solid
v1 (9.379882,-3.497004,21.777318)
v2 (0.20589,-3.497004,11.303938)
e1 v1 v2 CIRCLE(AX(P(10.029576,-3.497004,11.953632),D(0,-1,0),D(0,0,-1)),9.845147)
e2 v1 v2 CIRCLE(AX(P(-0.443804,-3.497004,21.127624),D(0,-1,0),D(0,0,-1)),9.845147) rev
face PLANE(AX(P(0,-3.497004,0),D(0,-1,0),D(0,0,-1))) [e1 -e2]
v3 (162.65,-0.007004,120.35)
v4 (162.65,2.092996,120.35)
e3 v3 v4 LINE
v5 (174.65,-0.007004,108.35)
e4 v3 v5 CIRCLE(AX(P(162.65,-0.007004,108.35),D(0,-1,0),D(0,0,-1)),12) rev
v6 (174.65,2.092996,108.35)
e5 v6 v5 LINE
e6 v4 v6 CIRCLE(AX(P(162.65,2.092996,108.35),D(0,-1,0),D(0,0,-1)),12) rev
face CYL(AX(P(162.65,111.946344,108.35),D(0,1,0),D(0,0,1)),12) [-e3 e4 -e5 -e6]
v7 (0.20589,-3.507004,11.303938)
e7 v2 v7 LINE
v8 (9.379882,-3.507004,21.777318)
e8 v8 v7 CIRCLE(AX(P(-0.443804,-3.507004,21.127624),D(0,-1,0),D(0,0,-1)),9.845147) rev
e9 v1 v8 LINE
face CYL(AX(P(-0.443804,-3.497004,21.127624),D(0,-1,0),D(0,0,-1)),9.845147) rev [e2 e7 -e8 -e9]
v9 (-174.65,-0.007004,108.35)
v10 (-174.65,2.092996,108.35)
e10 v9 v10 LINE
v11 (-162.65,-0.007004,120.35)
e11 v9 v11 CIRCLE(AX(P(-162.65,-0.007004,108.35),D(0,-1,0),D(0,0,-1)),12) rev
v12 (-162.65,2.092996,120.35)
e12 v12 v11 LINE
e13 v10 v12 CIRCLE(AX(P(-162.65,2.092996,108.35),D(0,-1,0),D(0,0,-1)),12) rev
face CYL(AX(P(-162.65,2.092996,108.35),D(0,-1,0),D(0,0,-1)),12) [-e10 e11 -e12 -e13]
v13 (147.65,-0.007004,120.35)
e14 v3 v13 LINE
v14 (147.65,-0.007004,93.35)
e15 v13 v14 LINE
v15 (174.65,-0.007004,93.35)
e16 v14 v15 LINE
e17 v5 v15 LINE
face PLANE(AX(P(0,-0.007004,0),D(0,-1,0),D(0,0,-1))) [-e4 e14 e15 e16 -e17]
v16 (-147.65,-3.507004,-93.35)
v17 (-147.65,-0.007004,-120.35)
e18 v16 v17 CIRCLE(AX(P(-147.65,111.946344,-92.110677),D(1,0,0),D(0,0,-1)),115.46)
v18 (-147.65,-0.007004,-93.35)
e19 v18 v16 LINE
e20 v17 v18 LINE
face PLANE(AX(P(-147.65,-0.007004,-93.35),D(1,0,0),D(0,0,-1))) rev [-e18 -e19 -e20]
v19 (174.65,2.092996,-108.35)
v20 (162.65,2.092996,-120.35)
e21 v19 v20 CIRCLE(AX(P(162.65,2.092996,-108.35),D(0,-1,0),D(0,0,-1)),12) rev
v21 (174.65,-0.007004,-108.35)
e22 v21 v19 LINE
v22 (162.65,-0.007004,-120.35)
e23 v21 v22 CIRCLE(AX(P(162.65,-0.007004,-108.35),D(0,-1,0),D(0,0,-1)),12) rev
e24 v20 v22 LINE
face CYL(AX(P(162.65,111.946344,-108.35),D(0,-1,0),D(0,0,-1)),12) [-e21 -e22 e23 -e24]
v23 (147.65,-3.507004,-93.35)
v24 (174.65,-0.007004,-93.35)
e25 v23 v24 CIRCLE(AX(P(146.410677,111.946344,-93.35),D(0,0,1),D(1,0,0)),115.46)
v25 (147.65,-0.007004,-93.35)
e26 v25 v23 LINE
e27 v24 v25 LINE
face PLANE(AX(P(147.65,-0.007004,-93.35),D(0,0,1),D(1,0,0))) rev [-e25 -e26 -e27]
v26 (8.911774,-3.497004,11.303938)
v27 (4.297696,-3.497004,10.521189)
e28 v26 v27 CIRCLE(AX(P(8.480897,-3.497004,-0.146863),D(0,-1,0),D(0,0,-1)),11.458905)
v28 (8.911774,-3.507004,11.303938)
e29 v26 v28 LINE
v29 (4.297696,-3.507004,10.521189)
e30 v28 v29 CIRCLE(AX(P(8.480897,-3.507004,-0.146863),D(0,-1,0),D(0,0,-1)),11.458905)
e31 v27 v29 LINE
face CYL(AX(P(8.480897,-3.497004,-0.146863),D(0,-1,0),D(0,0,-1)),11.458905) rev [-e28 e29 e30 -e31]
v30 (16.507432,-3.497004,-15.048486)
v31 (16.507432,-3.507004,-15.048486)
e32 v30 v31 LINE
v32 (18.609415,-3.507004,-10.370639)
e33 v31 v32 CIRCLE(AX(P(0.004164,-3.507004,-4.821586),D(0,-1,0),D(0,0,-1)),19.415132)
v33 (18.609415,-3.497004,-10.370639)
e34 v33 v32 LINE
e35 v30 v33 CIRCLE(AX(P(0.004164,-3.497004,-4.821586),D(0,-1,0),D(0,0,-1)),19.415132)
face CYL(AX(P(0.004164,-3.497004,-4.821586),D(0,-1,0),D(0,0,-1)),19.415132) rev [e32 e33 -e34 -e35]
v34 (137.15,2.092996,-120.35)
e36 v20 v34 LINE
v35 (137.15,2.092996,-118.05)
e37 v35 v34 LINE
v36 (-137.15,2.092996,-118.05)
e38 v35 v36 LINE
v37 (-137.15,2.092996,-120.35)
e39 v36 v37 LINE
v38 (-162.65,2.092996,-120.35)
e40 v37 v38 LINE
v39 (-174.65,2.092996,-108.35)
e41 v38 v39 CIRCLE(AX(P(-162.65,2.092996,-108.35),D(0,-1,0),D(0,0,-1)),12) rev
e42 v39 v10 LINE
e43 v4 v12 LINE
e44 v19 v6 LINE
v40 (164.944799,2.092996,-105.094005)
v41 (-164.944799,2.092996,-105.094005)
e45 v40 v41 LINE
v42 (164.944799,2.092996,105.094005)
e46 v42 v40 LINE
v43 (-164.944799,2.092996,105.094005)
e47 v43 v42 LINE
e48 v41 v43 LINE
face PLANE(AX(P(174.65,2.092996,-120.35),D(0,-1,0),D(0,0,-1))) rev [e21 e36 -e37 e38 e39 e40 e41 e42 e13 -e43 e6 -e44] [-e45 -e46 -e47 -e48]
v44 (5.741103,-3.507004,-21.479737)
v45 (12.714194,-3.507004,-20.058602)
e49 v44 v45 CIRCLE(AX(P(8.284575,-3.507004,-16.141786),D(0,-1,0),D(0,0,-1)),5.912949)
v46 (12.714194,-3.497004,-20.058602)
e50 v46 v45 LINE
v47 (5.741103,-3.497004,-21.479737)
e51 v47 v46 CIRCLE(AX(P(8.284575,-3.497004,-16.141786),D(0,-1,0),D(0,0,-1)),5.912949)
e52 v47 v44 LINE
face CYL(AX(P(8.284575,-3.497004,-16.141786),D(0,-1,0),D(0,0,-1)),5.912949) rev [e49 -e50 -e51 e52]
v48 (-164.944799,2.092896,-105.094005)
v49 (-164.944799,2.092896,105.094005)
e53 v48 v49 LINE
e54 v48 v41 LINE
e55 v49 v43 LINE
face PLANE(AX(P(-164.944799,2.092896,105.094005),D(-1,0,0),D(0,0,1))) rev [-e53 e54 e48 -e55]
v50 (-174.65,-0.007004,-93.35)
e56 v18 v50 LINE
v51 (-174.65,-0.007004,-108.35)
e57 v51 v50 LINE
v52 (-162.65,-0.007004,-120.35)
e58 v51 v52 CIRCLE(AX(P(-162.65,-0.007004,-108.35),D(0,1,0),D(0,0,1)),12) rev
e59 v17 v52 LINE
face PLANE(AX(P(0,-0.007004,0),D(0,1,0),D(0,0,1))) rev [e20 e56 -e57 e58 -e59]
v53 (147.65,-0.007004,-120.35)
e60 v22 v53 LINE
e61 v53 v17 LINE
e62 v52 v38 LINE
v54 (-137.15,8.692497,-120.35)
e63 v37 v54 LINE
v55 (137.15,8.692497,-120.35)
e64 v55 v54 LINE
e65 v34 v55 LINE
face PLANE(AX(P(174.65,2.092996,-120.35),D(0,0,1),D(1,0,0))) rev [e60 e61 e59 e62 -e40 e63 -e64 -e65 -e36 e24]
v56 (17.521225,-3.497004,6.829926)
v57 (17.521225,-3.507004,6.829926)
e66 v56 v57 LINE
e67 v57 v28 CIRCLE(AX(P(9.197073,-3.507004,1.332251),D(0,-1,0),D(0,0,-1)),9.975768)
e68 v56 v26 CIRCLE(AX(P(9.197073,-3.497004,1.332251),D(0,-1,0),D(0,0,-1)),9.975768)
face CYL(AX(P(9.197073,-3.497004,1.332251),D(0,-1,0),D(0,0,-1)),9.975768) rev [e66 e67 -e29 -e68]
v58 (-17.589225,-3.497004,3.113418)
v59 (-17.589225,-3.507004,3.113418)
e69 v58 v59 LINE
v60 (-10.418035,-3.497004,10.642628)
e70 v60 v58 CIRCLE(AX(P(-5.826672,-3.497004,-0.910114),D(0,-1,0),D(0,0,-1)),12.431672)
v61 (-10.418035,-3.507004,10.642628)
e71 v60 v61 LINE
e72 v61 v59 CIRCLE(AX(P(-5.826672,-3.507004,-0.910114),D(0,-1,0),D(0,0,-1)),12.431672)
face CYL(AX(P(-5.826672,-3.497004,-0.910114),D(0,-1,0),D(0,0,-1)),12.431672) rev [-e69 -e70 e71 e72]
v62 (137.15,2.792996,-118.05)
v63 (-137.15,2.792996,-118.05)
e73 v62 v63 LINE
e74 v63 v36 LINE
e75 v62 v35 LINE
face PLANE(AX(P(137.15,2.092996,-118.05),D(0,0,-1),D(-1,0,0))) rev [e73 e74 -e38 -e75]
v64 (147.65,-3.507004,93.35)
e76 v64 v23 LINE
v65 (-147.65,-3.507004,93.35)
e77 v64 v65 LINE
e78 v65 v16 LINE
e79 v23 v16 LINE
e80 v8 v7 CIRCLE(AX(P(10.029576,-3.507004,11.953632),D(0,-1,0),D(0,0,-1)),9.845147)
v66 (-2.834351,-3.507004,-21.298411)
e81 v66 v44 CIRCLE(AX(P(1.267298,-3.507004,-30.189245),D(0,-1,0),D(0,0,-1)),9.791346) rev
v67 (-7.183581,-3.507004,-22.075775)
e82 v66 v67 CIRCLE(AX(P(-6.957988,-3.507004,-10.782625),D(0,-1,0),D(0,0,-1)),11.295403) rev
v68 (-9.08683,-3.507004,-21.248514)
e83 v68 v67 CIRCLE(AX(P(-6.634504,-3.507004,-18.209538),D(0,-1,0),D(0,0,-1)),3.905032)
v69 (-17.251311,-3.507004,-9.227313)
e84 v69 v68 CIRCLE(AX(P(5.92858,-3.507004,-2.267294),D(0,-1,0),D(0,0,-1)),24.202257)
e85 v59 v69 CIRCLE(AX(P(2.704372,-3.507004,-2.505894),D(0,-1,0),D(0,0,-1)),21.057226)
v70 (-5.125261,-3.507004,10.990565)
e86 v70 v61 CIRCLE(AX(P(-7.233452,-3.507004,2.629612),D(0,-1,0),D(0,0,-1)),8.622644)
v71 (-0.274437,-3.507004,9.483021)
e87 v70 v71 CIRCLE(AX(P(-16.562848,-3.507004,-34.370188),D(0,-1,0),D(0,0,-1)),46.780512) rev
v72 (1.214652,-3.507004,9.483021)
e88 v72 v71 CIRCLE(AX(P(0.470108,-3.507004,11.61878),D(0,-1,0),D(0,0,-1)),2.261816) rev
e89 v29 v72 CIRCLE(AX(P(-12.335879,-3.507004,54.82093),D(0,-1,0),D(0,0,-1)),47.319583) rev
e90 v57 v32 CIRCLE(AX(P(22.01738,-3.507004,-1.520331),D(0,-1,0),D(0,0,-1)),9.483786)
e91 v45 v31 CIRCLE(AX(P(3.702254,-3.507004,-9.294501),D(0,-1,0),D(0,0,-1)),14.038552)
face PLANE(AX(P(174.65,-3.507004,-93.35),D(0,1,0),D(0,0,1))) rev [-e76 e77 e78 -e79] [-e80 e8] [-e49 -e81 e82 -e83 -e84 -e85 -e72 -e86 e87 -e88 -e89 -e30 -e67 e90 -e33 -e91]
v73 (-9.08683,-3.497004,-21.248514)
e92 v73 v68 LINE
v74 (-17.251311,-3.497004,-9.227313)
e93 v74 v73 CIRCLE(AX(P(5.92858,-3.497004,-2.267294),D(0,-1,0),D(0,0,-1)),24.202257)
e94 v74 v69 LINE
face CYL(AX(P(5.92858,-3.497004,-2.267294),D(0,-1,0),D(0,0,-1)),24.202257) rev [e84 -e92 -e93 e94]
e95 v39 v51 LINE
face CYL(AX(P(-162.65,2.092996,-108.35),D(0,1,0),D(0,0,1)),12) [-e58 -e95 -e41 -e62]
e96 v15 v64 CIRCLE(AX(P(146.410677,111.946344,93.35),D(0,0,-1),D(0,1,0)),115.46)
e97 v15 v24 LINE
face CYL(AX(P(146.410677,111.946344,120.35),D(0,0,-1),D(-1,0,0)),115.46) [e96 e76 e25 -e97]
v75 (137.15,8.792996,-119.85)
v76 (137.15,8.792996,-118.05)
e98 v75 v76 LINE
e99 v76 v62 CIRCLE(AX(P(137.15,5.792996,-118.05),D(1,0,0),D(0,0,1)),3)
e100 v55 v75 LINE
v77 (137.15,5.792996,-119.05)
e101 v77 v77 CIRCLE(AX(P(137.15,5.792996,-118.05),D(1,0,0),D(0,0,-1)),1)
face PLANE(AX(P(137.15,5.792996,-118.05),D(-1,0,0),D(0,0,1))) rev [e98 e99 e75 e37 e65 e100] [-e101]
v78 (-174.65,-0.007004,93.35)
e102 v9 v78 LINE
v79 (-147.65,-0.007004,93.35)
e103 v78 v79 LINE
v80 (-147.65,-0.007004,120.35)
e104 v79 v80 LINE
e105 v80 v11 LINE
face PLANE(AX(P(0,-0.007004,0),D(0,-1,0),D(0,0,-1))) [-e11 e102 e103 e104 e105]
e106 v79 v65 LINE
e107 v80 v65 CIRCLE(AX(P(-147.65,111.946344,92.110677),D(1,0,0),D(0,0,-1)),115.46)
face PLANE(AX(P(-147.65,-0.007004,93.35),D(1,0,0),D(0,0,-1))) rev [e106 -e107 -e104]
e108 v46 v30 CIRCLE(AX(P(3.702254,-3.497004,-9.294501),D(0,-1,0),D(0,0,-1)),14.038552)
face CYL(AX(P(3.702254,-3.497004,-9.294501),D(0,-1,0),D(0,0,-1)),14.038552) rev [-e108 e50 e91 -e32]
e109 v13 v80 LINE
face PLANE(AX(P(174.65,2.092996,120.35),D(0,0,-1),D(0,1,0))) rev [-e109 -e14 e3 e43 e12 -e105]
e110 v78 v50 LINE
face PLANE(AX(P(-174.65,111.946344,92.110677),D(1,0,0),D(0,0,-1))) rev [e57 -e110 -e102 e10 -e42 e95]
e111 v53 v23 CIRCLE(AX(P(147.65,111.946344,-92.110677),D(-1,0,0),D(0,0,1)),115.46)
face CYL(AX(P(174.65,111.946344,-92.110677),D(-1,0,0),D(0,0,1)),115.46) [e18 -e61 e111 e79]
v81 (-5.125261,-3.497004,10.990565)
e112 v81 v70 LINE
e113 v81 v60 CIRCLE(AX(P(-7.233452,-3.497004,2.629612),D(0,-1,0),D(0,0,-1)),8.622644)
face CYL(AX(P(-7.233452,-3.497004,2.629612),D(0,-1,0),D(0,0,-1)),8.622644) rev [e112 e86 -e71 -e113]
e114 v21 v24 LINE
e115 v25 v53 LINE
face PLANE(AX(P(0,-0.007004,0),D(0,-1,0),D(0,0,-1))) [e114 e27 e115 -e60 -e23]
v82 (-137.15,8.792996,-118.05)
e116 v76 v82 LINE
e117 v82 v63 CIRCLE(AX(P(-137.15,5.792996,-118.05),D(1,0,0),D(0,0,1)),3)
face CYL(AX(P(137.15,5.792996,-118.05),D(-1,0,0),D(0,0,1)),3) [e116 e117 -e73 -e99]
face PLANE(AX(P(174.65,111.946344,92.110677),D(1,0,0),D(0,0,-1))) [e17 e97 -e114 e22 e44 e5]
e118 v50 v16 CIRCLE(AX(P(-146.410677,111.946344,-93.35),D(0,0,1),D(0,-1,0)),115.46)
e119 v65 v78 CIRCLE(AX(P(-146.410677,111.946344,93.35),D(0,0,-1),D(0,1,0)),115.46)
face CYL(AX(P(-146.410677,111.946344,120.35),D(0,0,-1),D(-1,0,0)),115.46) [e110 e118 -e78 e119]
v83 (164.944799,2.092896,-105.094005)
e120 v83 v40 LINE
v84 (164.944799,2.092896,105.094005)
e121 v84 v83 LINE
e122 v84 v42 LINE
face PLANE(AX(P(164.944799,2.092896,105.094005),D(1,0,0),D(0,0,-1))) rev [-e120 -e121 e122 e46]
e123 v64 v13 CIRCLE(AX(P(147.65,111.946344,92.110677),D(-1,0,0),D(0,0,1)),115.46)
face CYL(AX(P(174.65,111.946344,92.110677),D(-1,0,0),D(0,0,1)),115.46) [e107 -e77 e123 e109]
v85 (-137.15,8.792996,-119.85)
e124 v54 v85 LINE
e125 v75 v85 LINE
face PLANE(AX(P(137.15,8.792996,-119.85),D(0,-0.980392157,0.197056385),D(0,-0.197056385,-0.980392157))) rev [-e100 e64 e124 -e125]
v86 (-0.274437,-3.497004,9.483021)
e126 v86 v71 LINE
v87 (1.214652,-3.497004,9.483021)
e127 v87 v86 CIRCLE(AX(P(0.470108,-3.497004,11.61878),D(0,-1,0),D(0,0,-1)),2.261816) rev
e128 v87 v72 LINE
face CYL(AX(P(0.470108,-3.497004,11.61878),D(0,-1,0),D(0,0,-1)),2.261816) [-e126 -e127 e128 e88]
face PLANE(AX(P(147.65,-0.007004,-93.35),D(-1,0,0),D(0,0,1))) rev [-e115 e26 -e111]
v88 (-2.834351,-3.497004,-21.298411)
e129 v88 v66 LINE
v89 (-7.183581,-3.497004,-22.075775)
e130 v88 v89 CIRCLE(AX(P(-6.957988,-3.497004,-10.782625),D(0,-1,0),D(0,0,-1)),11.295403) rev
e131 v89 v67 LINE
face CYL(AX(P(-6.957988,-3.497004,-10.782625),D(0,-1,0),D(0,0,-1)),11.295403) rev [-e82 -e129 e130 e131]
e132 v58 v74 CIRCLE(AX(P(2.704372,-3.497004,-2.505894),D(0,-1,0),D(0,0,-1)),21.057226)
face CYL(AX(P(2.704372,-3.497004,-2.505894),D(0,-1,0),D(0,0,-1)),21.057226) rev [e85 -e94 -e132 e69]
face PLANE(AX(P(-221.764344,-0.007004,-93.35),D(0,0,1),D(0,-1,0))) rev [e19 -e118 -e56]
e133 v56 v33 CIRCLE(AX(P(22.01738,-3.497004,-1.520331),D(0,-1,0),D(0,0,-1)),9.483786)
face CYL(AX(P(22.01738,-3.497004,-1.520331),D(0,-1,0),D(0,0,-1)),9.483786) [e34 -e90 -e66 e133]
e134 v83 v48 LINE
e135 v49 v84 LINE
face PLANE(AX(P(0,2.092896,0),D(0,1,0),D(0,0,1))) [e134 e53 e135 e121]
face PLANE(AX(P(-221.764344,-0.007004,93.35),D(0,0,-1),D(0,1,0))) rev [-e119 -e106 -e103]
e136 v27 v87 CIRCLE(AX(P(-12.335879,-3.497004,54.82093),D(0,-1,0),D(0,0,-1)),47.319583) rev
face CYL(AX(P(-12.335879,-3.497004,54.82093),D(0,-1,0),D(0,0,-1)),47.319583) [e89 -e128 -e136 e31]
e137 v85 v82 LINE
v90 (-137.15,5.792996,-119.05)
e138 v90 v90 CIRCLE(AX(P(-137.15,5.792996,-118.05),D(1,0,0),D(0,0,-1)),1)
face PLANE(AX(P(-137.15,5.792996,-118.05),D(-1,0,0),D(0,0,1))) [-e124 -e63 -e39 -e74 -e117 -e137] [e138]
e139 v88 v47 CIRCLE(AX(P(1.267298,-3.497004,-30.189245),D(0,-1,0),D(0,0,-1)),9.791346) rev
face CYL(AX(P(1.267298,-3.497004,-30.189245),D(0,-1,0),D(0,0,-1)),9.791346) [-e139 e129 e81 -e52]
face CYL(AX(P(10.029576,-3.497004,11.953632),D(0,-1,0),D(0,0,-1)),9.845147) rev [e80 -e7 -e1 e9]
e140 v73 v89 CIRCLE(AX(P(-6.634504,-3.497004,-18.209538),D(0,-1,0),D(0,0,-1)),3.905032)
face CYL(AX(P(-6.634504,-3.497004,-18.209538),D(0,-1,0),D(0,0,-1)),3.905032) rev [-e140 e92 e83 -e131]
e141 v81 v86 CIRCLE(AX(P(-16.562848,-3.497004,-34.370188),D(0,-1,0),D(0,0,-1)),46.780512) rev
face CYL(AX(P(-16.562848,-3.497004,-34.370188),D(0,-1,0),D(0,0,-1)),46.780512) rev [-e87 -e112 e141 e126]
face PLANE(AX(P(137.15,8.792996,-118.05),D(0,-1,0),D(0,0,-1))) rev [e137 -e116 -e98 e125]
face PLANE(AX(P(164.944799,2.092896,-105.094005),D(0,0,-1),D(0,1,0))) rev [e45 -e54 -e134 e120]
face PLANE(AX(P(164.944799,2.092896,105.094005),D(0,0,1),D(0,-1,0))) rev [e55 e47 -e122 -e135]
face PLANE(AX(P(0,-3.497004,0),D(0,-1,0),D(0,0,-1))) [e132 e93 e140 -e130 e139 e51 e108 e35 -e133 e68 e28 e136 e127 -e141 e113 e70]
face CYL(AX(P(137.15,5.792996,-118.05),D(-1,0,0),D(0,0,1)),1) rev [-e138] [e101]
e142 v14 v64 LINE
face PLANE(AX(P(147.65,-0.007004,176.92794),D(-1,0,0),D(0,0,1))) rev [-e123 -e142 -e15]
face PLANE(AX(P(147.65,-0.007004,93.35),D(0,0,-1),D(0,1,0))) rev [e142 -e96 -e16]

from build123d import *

# Parameters (mm, degrees)
BOSS_EXTRUDE1_DEPTH   = 174.65
BOSS_EXTRUDE2_DEPTH   = 295.3
BOSS_EXTRUDE2_2_DEPTH = 295.3
CUT_EXTRUDE1_DEPTH    = 564.747214252
FILLET1_R             = 12
CUT_EXTRUDE2_DEPTH    = 3.5
SKETCH6_R             = 1
BOSS_EXTRUDE3_DEPTH   = 137.15
SKETCH7_W             = 329.889597284
SKETCH7_H             = 210.188009182
CUT_EXTRUDE3_DEPTH    = 0.0001
CUT_EXTRUDE4_START    = -0.01
CUT_EXTRUDE4_DEPTH    = 0.01


# Read off the part's stored shape, not the designer's step: Cut-Extrude4
with BuildPart() as part:
    # Sketch1 → Boss-Extrude1 (new, symmetric)
    with BuildSketch(Plane(origin=(0, 0, 0), x_dir=(0, 0, -1), z_dir=(1, 0, 0))):
        with BuildLine():
            Line((120.35, 2.092995949), (-120.35, 2.092995949))
            Line((-120.35, 2.092995949), (-120.35, -0.007004051))
            ThreePointArc((-120.35, -0.007004051), (-106.953525194, -2.555626976), (-93.35, -3.507004051))
            Line((-93.35, -3.507004051), (93.35, -3.507004051))
            ThreePointArc((93.35, -3.507004051), (106.953525194, -2.555626976), (120.35, -0.007004051))
            Line((120.35, -0.007004051), (120.35, 2.092995949))
        make_face()
    extrude(amount=BOSS_EXTRUDE1_DEPTH, both=True)


with BuildPart() as body_2:
    # Sketch3 → Boss-Extrude2 (new body)
    with BuildSketch(Plane(origin=(0, 0, -120.35), x_dir=(-1, 0, 0), z_dir=(0, 0, -1))):
        with BuildLine():
            Line((174.65, -3.507004051), (174.65, -0.007004051))
            ThreePointArc((174.65, -0.007004051), (161.253525194, -2.555626976), (147.65, -3.507004051))
            Line((147.65, -3.507004051), (174.65, -3.507004051))
        make_face()
    extrude(amount=BOSS_EXTRUDE2_DEPTH)


with BuildPart() as body_3:
    # Sketch3 → Boss-Extrude2 2 (new body)
    with BuildSketch(Plane(origin=(0, 0, -120.35), x_dir=(-1, 0, 0), z_dir=(0, 0, -1))):
        with BuildLine():
            Line((-174.65, -3.507004051), (-147.65, -3.507004051))
            ThreePointArc((-147.65, -3.507004051), (-161.253525194, -2.555626976), (-174.65, -0.007004051))
            Line((-174.65, -0.007004051), (-174.65, -3.507004051))
        make_face()
    extrude(amount=BOSS_EXTRUDE2_2_DEPTH)


with BuildPart() as cut_extrude1_tool:
    # Sketch4 → Cut-Extrude1 (new, through all)
    with BuildSketch(Plane(origin=(0, 0, -415.65), x_dir=(-1, 0, 0), z_dir=(0, 0, -1))):
        with BuildLine():
            Line((-174.65, -0.007004051), (-174.65, -3.507004051))
            Line((-174.65, -3.507004051), (-147.65, -3.507004051))
            ThreePointArc((-147.65, -3.507004051), (-161.253525194, -2.555626976), (-174.65, -0.007004051))
        make_face()
        with BuildLine():
            Line((174.65, -3.507004051), (174.65, -0.007004051))
            ThreePointArc((174.65, -0.007004051), (161.253525194, -2.555626976), (147.65, -3.507004051))
            Line((147.65, -3.507004051), (174.65, -3.507004051))
        make_face()
    extrude(amount=-CUT_EXTRUDE1_DEPTH)


with BuildPart() as part_1:
    add(part.part)

    # Cut-Extrude1: cut by cut_extrude1_tool
    add(cut_extrude1_tool.part, mode=Mode.SUBTRACT)

    # Fillet1
    fillet1_edges = [part_1.edges().sort_by_distance(p)[0] for p in [
        (-174.65, 1.042995949, 120.35),
        (-174.65, 1.042995949, -120.35),
        (174.65, 1.042995949, -120.35),
        (174.65, 1.042995949, 120.35),
    ]]
    fillet(fillet1_edges, radius=FILLET1_R)

    # Sketch5 → Cut-Extrude2 (cut)
    with BuildSketch(Plane.XZ.offset(3.507004051)):
        Polygon((147.65, -93.35), (210.030677808, -93.35), (147.65, -135.593204027), align=None)
        Polygon((147.65, 93.35), (239.751162266, 93.35), (147.65, 176.927939597), align=None)
        Polygon((-147.65, -93.35), (-147.65, -130.932477463), (-221.764343706, -93.35), align=None)
        Polygon((-147.65, 93.35), (-147.65, 153.997058362), (-221.764343706, 93.35), align=None)
    extrude(amount=-CUT_EXTRUDE2_DEPTH, mode=Mode.SUBTRACT)

    # Sketch6 → Boss-Extrude3 (add, symmetric)
    with BuildSketch(Plane(origin=(0, 0, 0), x_dir=(0, 0, -1), z_dir=(1, 0, 0))):
        with BuildLine():
            Line((118.05, 2.092995949), (118.05, 2.792995949))
            ThreePointArc((118.05, 2.792995949), (115.05, 5.792995949), (118.05, 8.792995949))
            Line((118.05, 8.792995949), (119.85, 8.792995949))
            Line((119.85, 8.792995949), (120.35, 8.692497192))
            Line((120.35, 8.692497192), (120.35, 2.092995949))
            Line((120.35, 2.092995949), (118.05, 2.092995949))
        make_face()
        with Locations((118.05, 5.792995949)):
            Circle(SKETCH6_R, mode=Mode.SUBTRACT)
    extrude(amount=BOSS_EXTRUDE3_DEPTH, both=True)

    # Sketch7 → Cut-Extrude3 (cut)
    with BuildSketch(Plane(origin=(0, 2.092995949, 0), x_dir=(1, 0, 0), z_dir=(0, 1, 0))):
        Rectangle(SKETCH7_W, SKETCH7_H)
    extrude(amount=-CUT_EXTRUDE3_DEPTH, mode=Mode.SUBTRACT)

    # Cut-Extrude4 outline → Cut-Extrude4 (cut)
    with BuildSketch(Plane.XZ.offset(3.507004051).offset(CUT_EXTRUDE4_START)):
        with BuildLine():
            ThreePointArc((-9.086829944, -21.248513597), (-8.191165567, -21.790889583), (-7.183580977, -22.075774961))
            ThreePointArc((-7.183580977, -22.075774961), (-4.970587657, -21.901814224), (-2.834351243, -21.298410749))
            ThreePointArc((-2.834351243, -21.298410749), (1.47428793, -20.400086874), (5.741103254, -21.479736959))
            ThreePointArc((5.741103254, -21.479736959), (9.465377292, -21.935634067), (12.714193917, -20.058601881))
            ThreePointArc((12.714193917, -20.058601881), (14.894750295, -17.768517515), (16.507432012, -15.048486227))
            ThreePointArc((16.507432012, -15.048486227), (17.713556536, -12.779271655), (18.609414677, -10.370639402))
            ThreePointArc((18.609414677, -10.370639402), (12.55251676, -2.119122901), (17.521225226, 6.829925827))
            ThreePointArc((17.521225226, 6.829925827), (13.797071641, 10.184140705), (8.911774187, 11.303938081))
            ThreePointArc((8.911774187, 11.303938081), (6.564348471, 11.150629708), (4.297695677, 10.521188635))
            ThreePointArc((4.297695677, 10.521188635), (2.765098172, 9.975602694), (1.214652309, 9.48302097))
            ThreePointArc((1.214652309, 9.48302097), (0.470107822, 9.356963669), (-0.274436665, 9.48302097))
            ThreePointArc((-0.274436665, 9.48302097), (-2.679371626, 10.302682573), (-5.125261124, 10.990564736))
            ThreePointArc((-5.125261124, 10.990564736), (-7.799066446, 11.233685421), (-10.418034599, 10.642628414))
            ThreePointArc((-10.418034599, 10.642628414), (-14.82861028, 7.663775104), (-17.589225206, 3.113417964))
            ThreePointArc((-17.589225206, 3.113417964), (-18.344964165, -3.082267775), (-17.251311031, -9.22731342))
            ThreePointArc((-17.251311031, -9.22731342), (-14.092597967, -15.865148937), (-9.086829944, -21.248513597))
        make_face()
        with BuildLine():
            ThreePointArc((9.379881835, 21.777318235), (2.623777692, 18.44062415), (0.205889652, 11.303938081))
            ThreePointArc((0.205889652, 11.303938081), (6.961993795, 14.640632167), (9.379881835, 21.777318235))
        make_face()
    extrude(amount=CUT_EXTRUDE4_DEPTH, mode=Mode.SUBTRACT)


with BuildPart() as body_2_1:
    add(body_2.part)

    # Cut-Extrude1: cut by cut_extrude1_tool
    add(cut_extrude1_tool.part, mode=Mode.SUBTRACT)


with BuildPart() as body_3_1:
    add(body_3.part)

    # Cut-Extrude1: cut by cut_extrude1_tool
    add(cut_extrude1_tool.part, mode=Mode.SUBTRACT)


solid = part_1.part
